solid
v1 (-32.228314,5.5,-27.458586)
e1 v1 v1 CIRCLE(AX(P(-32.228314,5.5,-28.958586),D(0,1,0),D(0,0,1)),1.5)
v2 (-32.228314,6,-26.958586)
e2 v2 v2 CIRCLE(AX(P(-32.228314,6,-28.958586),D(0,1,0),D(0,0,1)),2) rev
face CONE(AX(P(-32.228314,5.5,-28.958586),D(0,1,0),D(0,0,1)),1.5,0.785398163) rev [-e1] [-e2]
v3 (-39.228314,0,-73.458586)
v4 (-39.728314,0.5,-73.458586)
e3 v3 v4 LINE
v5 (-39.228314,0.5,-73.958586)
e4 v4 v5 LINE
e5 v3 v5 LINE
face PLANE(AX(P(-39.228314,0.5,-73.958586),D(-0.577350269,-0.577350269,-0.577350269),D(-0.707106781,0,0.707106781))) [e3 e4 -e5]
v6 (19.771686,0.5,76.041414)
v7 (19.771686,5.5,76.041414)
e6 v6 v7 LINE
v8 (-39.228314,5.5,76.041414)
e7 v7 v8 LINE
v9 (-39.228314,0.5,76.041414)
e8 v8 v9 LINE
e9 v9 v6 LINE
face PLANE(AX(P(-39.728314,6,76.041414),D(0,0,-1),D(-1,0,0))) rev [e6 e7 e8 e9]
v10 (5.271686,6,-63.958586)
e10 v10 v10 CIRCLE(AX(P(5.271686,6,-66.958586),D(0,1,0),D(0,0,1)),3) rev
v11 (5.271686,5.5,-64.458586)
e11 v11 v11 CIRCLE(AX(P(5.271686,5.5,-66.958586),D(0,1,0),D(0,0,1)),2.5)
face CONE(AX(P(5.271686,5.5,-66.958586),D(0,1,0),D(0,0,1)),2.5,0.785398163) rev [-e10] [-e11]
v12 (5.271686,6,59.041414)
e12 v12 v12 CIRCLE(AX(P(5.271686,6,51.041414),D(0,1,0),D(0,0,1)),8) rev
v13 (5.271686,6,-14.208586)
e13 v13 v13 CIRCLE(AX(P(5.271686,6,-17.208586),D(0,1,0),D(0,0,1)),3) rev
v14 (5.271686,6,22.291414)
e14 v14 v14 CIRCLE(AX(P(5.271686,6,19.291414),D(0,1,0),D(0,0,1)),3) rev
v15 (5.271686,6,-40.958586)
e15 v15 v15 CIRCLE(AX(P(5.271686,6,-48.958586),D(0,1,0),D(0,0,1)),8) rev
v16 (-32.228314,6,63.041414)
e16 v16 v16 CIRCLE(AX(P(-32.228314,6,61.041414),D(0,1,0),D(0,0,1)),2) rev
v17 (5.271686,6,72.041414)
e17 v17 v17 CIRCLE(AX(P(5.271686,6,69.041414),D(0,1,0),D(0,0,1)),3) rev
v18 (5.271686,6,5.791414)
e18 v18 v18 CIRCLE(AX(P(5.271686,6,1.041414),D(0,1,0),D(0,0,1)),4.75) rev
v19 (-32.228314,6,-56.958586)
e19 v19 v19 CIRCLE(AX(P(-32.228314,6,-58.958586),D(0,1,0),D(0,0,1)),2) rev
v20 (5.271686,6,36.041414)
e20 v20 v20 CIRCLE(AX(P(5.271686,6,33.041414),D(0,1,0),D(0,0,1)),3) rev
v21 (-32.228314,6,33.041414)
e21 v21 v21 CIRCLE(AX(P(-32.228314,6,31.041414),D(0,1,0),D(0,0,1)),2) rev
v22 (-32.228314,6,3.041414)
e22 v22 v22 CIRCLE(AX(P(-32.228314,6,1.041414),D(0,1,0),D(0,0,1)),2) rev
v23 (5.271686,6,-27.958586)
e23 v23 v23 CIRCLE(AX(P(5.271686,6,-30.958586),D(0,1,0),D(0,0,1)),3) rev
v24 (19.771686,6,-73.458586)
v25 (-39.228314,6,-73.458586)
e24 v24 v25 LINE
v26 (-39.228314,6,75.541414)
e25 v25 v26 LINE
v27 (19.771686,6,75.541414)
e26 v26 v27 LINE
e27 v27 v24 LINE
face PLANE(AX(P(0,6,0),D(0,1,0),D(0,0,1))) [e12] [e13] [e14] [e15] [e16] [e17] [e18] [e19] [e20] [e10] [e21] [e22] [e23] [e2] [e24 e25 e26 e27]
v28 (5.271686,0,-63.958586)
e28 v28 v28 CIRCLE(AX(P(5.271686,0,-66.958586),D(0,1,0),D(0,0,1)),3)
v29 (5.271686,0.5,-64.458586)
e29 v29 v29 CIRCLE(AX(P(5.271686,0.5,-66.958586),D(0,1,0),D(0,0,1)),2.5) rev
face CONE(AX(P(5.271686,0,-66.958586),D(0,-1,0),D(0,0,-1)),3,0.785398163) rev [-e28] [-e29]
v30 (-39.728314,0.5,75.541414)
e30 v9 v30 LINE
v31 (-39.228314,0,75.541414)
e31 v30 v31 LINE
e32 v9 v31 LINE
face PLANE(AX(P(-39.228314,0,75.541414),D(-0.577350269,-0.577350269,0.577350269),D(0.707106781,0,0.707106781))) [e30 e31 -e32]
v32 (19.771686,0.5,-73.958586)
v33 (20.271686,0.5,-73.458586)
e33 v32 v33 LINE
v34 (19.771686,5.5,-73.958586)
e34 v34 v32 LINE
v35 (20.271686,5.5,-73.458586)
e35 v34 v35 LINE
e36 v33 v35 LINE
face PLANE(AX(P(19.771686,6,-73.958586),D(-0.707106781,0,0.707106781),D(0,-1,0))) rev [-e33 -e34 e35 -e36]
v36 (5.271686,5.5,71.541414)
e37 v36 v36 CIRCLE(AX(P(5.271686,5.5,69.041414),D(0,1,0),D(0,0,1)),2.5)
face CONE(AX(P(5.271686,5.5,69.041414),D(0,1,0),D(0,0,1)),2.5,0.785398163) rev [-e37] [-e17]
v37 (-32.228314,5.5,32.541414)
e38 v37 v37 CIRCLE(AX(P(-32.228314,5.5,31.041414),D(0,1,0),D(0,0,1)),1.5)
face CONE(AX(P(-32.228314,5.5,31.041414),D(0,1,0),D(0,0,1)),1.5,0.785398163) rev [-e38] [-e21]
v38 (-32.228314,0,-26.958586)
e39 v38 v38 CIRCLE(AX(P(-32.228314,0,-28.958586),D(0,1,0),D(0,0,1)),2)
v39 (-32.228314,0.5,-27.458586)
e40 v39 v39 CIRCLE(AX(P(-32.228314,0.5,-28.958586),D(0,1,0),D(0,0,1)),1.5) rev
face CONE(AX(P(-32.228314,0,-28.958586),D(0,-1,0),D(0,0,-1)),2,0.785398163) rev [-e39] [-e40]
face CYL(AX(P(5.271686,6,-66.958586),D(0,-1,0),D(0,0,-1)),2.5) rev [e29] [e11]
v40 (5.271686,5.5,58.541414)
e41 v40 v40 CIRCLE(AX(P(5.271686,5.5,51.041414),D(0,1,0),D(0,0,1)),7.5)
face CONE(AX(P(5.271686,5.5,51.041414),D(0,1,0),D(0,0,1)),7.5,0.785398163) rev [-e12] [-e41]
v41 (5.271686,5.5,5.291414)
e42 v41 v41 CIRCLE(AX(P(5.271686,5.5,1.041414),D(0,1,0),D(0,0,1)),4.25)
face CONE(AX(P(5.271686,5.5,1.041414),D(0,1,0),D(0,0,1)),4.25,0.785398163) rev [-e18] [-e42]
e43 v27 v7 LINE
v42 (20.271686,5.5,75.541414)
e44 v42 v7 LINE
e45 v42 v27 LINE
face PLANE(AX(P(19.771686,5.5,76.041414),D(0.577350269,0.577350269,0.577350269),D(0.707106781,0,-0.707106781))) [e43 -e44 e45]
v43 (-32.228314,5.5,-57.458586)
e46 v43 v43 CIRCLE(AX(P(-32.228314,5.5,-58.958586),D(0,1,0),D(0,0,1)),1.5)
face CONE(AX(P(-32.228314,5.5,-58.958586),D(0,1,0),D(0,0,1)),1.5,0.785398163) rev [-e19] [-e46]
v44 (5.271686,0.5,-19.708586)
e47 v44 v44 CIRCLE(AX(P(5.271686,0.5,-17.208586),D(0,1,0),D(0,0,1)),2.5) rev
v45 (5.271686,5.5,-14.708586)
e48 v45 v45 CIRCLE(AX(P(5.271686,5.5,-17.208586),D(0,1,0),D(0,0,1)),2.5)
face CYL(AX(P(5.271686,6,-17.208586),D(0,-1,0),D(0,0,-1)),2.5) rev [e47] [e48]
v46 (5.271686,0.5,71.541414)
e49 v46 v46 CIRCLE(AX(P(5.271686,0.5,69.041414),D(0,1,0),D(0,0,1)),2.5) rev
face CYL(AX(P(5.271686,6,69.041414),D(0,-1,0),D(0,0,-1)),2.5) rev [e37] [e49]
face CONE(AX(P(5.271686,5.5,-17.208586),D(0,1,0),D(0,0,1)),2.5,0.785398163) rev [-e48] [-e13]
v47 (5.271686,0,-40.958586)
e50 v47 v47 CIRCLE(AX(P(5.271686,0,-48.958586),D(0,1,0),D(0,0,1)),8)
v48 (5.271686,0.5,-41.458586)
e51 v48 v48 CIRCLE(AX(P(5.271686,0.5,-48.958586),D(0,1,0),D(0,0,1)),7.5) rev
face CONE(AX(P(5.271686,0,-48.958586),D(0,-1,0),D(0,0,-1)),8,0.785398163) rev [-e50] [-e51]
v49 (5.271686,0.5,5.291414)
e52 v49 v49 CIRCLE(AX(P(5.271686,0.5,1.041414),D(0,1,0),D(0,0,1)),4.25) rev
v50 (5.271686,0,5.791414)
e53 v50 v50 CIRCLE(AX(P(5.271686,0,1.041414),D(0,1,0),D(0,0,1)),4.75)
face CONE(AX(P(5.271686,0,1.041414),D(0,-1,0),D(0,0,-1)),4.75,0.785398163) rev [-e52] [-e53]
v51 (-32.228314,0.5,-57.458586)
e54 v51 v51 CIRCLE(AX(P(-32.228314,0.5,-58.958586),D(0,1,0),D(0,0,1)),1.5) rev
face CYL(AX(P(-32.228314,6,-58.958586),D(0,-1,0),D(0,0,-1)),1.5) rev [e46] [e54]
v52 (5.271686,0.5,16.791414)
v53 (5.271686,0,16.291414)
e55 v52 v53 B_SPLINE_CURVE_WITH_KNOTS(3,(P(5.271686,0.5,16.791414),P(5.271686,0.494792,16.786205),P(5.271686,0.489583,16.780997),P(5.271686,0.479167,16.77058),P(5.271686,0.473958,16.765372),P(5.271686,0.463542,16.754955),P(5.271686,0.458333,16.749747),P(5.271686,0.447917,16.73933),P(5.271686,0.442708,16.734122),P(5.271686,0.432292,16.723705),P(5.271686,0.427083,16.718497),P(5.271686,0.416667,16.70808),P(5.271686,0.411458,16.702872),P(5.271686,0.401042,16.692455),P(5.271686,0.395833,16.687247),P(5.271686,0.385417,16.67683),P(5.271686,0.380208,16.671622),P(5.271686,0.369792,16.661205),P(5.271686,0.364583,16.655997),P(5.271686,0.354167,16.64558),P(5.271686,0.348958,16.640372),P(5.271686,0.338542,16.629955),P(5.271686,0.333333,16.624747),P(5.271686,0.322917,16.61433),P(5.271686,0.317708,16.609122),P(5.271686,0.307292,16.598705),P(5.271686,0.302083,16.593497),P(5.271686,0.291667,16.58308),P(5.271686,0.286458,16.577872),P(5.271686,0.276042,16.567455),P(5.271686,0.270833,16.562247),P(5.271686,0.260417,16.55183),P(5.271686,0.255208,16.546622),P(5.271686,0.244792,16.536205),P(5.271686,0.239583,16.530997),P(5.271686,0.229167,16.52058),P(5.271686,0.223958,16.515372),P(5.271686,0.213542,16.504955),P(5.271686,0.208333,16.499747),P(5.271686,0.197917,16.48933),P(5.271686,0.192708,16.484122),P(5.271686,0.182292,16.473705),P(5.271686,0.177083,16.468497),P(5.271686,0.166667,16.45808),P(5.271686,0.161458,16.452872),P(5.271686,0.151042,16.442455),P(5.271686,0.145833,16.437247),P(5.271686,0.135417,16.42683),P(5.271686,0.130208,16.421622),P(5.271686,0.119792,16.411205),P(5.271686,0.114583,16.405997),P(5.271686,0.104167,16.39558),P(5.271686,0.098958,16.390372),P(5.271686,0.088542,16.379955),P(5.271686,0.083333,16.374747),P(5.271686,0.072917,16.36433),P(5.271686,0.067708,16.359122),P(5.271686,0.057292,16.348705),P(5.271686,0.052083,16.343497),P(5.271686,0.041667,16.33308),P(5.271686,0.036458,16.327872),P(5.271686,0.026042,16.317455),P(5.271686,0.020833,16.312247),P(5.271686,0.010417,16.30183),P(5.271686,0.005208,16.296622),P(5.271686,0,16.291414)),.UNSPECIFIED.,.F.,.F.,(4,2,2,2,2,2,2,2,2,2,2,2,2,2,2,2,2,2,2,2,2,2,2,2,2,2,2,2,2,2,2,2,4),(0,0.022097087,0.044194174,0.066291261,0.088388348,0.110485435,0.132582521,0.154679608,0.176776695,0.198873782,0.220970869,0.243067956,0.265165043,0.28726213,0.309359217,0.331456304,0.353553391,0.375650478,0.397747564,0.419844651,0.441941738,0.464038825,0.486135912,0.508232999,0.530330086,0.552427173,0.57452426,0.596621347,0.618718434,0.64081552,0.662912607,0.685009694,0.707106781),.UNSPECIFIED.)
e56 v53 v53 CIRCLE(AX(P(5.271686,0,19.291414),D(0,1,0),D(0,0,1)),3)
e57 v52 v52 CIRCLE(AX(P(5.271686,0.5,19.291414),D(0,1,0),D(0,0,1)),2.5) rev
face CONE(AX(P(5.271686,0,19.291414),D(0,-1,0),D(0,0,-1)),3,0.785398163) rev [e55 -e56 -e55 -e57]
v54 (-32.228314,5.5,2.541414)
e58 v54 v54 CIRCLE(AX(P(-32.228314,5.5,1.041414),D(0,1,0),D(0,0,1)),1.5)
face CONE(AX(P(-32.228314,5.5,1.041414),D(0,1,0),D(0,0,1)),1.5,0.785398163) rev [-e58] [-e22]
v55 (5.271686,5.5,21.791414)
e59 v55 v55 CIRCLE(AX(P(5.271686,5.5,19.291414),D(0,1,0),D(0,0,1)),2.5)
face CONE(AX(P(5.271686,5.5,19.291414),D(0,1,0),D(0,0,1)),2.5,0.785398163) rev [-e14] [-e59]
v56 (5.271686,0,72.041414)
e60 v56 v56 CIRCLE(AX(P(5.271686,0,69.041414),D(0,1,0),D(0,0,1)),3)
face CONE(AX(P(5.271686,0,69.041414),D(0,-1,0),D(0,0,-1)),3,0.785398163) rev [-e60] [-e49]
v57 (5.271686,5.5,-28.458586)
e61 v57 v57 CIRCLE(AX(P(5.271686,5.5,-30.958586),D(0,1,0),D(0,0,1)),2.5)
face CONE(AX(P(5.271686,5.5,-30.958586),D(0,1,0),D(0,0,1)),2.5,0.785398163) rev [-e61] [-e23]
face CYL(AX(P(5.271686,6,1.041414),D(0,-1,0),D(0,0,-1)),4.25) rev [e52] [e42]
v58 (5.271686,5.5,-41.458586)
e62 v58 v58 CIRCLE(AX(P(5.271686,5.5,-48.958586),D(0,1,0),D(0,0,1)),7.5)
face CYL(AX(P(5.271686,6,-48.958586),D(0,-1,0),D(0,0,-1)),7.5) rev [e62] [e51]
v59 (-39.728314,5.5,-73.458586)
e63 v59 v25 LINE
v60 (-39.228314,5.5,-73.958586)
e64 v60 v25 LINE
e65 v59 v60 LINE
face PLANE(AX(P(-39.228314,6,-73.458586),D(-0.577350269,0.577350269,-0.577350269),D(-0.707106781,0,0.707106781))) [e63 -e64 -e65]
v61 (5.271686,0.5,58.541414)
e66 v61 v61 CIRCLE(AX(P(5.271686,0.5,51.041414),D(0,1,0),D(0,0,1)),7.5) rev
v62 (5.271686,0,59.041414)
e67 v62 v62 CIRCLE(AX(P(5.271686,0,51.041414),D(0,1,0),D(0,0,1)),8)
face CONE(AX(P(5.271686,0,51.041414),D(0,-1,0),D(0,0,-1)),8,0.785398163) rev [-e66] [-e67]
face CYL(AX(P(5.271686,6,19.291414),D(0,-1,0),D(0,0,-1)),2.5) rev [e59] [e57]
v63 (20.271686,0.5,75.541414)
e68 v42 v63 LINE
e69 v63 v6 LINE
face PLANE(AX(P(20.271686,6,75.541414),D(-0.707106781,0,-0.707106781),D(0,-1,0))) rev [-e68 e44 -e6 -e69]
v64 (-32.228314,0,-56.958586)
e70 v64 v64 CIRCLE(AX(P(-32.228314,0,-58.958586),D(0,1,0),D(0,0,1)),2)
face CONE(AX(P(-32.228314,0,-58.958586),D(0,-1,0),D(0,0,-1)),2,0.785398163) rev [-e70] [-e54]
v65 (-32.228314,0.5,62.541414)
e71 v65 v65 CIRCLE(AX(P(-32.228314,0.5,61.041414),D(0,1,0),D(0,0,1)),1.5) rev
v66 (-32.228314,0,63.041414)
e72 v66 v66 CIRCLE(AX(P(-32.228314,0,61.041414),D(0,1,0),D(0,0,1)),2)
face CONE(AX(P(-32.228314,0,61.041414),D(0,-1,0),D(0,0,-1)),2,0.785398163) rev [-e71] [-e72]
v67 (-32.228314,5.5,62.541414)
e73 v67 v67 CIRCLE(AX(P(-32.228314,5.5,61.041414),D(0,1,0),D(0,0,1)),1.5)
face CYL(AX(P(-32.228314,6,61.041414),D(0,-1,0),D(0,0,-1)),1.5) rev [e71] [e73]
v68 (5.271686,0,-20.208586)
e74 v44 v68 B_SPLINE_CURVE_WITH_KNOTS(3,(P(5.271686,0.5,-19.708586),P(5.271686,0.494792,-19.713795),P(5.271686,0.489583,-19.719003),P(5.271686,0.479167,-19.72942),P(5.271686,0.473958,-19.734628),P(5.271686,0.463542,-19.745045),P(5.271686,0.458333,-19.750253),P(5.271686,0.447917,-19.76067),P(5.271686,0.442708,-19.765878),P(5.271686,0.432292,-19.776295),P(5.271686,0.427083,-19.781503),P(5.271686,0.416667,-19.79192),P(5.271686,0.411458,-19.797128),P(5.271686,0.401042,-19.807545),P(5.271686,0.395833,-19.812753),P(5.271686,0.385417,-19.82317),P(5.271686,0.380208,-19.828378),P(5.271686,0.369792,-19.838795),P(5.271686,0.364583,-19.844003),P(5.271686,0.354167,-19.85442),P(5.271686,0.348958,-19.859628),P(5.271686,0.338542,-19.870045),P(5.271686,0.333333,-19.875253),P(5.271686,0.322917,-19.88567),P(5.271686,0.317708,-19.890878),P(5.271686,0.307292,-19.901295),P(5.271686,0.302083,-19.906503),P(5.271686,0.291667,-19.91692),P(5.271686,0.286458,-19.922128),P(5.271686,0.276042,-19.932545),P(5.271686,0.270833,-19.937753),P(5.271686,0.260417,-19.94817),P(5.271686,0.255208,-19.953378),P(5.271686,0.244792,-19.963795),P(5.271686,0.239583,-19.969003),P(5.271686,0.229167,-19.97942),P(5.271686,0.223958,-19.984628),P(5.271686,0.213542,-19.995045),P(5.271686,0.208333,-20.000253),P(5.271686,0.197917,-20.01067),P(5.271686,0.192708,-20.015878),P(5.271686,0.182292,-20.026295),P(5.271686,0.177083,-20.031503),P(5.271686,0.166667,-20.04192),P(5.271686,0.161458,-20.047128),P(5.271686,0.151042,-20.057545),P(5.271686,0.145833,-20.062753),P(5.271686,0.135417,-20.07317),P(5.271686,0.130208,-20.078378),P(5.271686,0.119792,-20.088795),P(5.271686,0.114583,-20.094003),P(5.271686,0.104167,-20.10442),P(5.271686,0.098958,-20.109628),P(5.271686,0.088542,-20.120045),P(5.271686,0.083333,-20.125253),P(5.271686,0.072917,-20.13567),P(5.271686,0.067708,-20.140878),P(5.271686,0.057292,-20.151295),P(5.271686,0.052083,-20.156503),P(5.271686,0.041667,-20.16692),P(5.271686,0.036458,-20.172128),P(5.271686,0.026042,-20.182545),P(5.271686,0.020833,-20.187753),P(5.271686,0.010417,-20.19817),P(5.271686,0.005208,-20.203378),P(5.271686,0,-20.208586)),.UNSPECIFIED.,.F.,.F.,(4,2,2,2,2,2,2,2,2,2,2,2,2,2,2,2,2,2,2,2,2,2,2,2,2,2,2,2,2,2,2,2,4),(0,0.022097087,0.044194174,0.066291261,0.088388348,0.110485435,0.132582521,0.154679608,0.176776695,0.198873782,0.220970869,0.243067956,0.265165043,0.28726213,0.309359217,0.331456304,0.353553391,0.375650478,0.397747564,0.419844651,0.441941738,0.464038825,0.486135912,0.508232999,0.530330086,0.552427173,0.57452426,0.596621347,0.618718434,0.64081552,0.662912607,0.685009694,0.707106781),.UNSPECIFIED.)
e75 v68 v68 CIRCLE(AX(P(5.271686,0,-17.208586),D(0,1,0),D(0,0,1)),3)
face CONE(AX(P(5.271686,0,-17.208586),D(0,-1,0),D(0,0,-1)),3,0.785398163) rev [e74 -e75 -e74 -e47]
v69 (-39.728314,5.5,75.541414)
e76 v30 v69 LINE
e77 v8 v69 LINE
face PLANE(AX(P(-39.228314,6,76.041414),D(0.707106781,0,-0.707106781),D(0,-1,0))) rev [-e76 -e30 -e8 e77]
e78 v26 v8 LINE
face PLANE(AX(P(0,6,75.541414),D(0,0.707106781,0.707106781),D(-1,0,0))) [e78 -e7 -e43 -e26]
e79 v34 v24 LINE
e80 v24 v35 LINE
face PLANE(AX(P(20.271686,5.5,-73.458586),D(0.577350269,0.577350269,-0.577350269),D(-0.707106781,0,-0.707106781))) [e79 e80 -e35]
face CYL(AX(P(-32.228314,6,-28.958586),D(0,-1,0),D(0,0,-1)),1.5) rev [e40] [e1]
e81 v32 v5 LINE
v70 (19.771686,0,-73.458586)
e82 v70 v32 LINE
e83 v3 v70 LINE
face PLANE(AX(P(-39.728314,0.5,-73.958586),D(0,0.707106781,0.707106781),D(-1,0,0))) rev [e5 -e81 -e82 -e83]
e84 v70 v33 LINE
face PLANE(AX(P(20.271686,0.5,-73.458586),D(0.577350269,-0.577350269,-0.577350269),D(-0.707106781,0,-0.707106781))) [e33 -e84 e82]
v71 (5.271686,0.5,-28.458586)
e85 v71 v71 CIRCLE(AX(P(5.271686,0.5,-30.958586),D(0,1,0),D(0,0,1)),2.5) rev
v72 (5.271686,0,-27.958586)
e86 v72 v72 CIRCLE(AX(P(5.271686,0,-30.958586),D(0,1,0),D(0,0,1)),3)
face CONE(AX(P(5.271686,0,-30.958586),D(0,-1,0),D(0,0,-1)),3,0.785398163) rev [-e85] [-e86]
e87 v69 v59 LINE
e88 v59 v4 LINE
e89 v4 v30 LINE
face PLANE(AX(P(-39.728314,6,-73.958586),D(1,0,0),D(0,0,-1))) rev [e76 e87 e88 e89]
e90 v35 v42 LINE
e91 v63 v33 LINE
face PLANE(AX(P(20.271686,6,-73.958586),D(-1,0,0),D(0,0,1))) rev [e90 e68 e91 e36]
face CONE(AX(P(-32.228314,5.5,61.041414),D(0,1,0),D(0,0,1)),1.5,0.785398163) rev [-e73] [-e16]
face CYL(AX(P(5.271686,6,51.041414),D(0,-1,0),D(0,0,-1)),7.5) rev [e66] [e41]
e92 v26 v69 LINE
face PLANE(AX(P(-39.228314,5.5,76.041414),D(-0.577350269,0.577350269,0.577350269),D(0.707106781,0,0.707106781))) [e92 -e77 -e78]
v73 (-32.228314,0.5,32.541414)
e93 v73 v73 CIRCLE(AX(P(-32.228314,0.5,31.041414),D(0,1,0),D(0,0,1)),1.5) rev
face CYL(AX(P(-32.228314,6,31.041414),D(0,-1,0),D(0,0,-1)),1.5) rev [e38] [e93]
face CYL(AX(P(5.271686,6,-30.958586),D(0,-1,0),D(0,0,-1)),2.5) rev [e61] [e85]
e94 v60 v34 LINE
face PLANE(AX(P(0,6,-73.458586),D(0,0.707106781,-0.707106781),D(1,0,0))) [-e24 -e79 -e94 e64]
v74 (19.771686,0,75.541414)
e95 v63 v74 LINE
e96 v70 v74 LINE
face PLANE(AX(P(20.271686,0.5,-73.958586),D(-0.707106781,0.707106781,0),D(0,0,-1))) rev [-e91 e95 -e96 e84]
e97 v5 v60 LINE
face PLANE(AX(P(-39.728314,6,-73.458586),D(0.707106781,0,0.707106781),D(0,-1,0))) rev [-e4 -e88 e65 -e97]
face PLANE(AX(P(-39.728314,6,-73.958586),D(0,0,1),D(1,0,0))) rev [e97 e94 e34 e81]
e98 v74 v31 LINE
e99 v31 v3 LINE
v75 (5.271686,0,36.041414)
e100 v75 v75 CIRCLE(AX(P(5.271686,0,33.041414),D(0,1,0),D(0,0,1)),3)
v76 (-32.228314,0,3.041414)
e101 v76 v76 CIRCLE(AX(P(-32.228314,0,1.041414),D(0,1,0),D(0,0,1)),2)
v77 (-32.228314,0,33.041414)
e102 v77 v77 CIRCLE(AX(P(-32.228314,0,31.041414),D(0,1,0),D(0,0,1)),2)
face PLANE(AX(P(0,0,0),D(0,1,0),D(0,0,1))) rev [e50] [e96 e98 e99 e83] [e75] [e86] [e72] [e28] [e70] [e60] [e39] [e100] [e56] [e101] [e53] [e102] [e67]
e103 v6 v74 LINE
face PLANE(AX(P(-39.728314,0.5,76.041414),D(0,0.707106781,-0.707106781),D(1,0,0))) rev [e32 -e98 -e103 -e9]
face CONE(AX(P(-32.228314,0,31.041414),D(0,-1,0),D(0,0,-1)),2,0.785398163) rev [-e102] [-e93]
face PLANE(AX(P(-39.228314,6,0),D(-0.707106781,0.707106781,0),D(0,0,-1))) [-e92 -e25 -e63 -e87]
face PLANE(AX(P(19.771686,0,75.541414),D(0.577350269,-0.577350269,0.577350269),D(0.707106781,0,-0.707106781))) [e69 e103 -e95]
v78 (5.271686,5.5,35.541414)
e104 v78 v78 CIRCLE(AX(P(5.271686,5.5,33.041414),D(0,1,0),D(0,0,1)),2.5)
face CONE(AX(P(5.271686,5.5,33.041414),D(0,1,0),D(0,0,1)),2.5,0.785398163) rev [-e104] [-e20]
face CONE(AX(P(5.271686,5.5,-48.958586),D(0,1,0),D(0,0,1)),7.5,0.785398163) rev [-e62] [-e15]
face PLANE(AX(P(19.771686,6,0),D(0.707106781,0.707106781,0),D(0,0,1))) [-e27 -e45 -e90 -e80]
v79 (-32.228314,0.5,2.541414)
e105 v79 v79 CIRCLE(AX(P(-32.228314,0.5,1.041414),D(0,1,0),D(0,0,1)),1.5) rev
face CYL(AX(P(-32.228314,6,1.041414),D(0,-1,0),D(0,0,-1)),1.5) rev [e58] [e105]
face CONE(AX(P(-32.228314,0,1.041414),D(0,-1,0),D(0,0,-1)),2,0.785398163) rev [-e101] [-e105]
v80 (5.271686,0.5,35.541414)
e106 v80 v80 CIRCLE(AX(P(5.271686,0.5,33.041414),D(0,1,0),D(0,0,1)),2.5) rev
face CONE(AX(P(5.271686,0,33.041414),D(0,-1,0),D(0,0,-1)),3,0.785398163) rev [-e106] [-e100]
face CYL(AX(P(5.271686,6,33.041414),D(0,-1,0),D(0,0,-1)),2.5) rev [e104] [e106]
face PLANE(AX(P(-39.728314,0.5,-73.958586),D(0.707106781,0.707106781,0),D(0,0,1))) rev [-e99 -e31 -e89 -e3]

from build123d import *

# Parameters (mm, degrees)
CROQUIS1_W              = 60
CROQUIS1_H              = 150
CROQUIS1_R              = 1.5
CROQUIS1_R_2            = 2.5
CROQUIS1_R_3            = 4.25
CROQUIS1_R_4            = 7.5
SALIENTE_EXTRUIR1_DEPTH = 6
CHAFL_N1_SIZE           = 0.5


with BuildPart() as part:
    # Croquis1 → Saliente-Extruir1 (new body)
    with BuildSketch(Plane(origin=(0, 0, 0), x_dir=(1, 0, 0), z_dir=(0, 1, 0))):
        with Locations((-9.728313692, -1.041413592)):
            Rectangle(CROQUIS1_W, CROQUIS1_H)
        with Locations((-32.228313692, 28.958586408)):
            Circle(CROQUIS1_R, mode=Mode.SUBTRACT)
        with Locations((-32.228313692, -31.041413592)):
            Circle(CROQUIS1_R, mode=Mode.SUBTRACT)
        with Locations((5.271686308, 17.208586408)):
            Circle(CROQUIS1_R_2, mode=Mode.SUBTRACT)
        with Locations((5.271686308, -19.291413592)):
            Circle(CROQUIS1_R_2, mode=Mode.SUBTRACT)
        with Locations((-32.228313692, 58.958586408)):
            Circle(CROQUIS1_R, mode=Mode.SUBTRACT)
        with Locations((-32.228313692, -61.041413592)):
            Circle(CROQUIS1_R, mode=Mode.SUBTRACT)
        with Locations((5.271686308, -1.041413592)):
            Circle(CROQUIS1_R_3, mode=Mode.SUBTRACT)
        with Locations((-32.228313692, -1.041413592)):
            Circle(CROQUIS1_R, mode=Mode.SUBTRACT)
        with Locations((5.271686308, -51.041413592)):
            Circle(CROQUIS1_R_4, mode=Mode.SUBTRACT)
        with Locations((5.271686308, 48.958586408)):
            Circle(CROQUIS1_R_4, mode=Mode.SUBTRACT)
        with Locations((5.271686308, 66.958586408)):
            Circle(CROQUIS1_R_2, mode=Mode.SUBTRACT)
        with Locations((5.271686308, 30.958586408)):
            Circle(CROQUIS1_R_2, mode=Mode.SUBTRACT)
        with Locations((5.271686308, -33.041413592)):
            Circle(CROQUIS1_R_2, mode=Mode.SUBTRACT)
        with Locations((5.271686308, -69.041413592)):
            Circle(CROQUIS1_R_2, mode=Mode.SUBTRACT)
    extrude(amount=SALIENTE_EXTRUIR1_DEPTH)

    # Chaflán1
    chafl_n1_edges = [part.edges().sort_by_distance(p)[0] for p in [
        (-39.728313692, 3, -73.958586408),
        (-39.728313692, 3, 76.041413592),
        (20.271686308, 3, 76.041413592),
        (-9.728313692, 0, 76.041413592),
        (20.271686308, 0, 1.041413592),
        (-39.728313692, 0, 1.041413592),
        (-9.728313692, 0, -73.958586408),
        (20.271686308, 3, -73.958586408),
        (-9.728313692, 6, -73.958586408),
        (20.271686308, 6, 1.041413592),
        (-9.728313692, 6, 76.041413592),
        (-39.728313692, 6, 1.041413592),
        (-33.728313692, 0, 61.041413592),
        (-33.728313692, 0, -58.958586408),
        (-33.728313692, 6, 61.041413592),
        (-33.728313692, 6, -58.958586408),
        (1.021686308, 0, 1.041413592),
        (1.021686308, 6, 1.041413592),
        (-2.228313692, 0, -48.958586408),
        (-33.728313692, 0, 1.041413592),
        (-2.228313692, 0, 51.041413592),
        (-2.228313692, 6, -48.958586408),
        (-33.728313692, 6, 1.041413592),
        (-2.228313692, 6, 51.041413592),
        (2.771686308, 0, 69.041413592),
        (2.771686308, 0, -30.958586408),
        (2.771686308, 0, -66.958586408),
        (2.771686308, 0, 33.041413592),
        (2.771686308, 6, 69.041413592),
        (2.771686308, 6, -30.958586408),
        (2.771686308, 6, -66.958586408),
        (2.771686308, 6, 33.041413592),
        (-33.728313692, 0, 31.041413592),
        (-33.728313692, 0, -28.958586408),
        (-33.728313692, 6, 31.041413592),
        (-33.728313692, 6, -28.958586408),
        (2.771686308, 0, 19.291413592),
        (2.771686308, 0, -17.208586408),
        (2.771686308, 6, 19.291413592),
        (2.771686308, 6, -17.208586408),
    ]]
    chamfer(chafl_n1_edges, length=CHAFL_N1_SIZE)


solid = part.part
